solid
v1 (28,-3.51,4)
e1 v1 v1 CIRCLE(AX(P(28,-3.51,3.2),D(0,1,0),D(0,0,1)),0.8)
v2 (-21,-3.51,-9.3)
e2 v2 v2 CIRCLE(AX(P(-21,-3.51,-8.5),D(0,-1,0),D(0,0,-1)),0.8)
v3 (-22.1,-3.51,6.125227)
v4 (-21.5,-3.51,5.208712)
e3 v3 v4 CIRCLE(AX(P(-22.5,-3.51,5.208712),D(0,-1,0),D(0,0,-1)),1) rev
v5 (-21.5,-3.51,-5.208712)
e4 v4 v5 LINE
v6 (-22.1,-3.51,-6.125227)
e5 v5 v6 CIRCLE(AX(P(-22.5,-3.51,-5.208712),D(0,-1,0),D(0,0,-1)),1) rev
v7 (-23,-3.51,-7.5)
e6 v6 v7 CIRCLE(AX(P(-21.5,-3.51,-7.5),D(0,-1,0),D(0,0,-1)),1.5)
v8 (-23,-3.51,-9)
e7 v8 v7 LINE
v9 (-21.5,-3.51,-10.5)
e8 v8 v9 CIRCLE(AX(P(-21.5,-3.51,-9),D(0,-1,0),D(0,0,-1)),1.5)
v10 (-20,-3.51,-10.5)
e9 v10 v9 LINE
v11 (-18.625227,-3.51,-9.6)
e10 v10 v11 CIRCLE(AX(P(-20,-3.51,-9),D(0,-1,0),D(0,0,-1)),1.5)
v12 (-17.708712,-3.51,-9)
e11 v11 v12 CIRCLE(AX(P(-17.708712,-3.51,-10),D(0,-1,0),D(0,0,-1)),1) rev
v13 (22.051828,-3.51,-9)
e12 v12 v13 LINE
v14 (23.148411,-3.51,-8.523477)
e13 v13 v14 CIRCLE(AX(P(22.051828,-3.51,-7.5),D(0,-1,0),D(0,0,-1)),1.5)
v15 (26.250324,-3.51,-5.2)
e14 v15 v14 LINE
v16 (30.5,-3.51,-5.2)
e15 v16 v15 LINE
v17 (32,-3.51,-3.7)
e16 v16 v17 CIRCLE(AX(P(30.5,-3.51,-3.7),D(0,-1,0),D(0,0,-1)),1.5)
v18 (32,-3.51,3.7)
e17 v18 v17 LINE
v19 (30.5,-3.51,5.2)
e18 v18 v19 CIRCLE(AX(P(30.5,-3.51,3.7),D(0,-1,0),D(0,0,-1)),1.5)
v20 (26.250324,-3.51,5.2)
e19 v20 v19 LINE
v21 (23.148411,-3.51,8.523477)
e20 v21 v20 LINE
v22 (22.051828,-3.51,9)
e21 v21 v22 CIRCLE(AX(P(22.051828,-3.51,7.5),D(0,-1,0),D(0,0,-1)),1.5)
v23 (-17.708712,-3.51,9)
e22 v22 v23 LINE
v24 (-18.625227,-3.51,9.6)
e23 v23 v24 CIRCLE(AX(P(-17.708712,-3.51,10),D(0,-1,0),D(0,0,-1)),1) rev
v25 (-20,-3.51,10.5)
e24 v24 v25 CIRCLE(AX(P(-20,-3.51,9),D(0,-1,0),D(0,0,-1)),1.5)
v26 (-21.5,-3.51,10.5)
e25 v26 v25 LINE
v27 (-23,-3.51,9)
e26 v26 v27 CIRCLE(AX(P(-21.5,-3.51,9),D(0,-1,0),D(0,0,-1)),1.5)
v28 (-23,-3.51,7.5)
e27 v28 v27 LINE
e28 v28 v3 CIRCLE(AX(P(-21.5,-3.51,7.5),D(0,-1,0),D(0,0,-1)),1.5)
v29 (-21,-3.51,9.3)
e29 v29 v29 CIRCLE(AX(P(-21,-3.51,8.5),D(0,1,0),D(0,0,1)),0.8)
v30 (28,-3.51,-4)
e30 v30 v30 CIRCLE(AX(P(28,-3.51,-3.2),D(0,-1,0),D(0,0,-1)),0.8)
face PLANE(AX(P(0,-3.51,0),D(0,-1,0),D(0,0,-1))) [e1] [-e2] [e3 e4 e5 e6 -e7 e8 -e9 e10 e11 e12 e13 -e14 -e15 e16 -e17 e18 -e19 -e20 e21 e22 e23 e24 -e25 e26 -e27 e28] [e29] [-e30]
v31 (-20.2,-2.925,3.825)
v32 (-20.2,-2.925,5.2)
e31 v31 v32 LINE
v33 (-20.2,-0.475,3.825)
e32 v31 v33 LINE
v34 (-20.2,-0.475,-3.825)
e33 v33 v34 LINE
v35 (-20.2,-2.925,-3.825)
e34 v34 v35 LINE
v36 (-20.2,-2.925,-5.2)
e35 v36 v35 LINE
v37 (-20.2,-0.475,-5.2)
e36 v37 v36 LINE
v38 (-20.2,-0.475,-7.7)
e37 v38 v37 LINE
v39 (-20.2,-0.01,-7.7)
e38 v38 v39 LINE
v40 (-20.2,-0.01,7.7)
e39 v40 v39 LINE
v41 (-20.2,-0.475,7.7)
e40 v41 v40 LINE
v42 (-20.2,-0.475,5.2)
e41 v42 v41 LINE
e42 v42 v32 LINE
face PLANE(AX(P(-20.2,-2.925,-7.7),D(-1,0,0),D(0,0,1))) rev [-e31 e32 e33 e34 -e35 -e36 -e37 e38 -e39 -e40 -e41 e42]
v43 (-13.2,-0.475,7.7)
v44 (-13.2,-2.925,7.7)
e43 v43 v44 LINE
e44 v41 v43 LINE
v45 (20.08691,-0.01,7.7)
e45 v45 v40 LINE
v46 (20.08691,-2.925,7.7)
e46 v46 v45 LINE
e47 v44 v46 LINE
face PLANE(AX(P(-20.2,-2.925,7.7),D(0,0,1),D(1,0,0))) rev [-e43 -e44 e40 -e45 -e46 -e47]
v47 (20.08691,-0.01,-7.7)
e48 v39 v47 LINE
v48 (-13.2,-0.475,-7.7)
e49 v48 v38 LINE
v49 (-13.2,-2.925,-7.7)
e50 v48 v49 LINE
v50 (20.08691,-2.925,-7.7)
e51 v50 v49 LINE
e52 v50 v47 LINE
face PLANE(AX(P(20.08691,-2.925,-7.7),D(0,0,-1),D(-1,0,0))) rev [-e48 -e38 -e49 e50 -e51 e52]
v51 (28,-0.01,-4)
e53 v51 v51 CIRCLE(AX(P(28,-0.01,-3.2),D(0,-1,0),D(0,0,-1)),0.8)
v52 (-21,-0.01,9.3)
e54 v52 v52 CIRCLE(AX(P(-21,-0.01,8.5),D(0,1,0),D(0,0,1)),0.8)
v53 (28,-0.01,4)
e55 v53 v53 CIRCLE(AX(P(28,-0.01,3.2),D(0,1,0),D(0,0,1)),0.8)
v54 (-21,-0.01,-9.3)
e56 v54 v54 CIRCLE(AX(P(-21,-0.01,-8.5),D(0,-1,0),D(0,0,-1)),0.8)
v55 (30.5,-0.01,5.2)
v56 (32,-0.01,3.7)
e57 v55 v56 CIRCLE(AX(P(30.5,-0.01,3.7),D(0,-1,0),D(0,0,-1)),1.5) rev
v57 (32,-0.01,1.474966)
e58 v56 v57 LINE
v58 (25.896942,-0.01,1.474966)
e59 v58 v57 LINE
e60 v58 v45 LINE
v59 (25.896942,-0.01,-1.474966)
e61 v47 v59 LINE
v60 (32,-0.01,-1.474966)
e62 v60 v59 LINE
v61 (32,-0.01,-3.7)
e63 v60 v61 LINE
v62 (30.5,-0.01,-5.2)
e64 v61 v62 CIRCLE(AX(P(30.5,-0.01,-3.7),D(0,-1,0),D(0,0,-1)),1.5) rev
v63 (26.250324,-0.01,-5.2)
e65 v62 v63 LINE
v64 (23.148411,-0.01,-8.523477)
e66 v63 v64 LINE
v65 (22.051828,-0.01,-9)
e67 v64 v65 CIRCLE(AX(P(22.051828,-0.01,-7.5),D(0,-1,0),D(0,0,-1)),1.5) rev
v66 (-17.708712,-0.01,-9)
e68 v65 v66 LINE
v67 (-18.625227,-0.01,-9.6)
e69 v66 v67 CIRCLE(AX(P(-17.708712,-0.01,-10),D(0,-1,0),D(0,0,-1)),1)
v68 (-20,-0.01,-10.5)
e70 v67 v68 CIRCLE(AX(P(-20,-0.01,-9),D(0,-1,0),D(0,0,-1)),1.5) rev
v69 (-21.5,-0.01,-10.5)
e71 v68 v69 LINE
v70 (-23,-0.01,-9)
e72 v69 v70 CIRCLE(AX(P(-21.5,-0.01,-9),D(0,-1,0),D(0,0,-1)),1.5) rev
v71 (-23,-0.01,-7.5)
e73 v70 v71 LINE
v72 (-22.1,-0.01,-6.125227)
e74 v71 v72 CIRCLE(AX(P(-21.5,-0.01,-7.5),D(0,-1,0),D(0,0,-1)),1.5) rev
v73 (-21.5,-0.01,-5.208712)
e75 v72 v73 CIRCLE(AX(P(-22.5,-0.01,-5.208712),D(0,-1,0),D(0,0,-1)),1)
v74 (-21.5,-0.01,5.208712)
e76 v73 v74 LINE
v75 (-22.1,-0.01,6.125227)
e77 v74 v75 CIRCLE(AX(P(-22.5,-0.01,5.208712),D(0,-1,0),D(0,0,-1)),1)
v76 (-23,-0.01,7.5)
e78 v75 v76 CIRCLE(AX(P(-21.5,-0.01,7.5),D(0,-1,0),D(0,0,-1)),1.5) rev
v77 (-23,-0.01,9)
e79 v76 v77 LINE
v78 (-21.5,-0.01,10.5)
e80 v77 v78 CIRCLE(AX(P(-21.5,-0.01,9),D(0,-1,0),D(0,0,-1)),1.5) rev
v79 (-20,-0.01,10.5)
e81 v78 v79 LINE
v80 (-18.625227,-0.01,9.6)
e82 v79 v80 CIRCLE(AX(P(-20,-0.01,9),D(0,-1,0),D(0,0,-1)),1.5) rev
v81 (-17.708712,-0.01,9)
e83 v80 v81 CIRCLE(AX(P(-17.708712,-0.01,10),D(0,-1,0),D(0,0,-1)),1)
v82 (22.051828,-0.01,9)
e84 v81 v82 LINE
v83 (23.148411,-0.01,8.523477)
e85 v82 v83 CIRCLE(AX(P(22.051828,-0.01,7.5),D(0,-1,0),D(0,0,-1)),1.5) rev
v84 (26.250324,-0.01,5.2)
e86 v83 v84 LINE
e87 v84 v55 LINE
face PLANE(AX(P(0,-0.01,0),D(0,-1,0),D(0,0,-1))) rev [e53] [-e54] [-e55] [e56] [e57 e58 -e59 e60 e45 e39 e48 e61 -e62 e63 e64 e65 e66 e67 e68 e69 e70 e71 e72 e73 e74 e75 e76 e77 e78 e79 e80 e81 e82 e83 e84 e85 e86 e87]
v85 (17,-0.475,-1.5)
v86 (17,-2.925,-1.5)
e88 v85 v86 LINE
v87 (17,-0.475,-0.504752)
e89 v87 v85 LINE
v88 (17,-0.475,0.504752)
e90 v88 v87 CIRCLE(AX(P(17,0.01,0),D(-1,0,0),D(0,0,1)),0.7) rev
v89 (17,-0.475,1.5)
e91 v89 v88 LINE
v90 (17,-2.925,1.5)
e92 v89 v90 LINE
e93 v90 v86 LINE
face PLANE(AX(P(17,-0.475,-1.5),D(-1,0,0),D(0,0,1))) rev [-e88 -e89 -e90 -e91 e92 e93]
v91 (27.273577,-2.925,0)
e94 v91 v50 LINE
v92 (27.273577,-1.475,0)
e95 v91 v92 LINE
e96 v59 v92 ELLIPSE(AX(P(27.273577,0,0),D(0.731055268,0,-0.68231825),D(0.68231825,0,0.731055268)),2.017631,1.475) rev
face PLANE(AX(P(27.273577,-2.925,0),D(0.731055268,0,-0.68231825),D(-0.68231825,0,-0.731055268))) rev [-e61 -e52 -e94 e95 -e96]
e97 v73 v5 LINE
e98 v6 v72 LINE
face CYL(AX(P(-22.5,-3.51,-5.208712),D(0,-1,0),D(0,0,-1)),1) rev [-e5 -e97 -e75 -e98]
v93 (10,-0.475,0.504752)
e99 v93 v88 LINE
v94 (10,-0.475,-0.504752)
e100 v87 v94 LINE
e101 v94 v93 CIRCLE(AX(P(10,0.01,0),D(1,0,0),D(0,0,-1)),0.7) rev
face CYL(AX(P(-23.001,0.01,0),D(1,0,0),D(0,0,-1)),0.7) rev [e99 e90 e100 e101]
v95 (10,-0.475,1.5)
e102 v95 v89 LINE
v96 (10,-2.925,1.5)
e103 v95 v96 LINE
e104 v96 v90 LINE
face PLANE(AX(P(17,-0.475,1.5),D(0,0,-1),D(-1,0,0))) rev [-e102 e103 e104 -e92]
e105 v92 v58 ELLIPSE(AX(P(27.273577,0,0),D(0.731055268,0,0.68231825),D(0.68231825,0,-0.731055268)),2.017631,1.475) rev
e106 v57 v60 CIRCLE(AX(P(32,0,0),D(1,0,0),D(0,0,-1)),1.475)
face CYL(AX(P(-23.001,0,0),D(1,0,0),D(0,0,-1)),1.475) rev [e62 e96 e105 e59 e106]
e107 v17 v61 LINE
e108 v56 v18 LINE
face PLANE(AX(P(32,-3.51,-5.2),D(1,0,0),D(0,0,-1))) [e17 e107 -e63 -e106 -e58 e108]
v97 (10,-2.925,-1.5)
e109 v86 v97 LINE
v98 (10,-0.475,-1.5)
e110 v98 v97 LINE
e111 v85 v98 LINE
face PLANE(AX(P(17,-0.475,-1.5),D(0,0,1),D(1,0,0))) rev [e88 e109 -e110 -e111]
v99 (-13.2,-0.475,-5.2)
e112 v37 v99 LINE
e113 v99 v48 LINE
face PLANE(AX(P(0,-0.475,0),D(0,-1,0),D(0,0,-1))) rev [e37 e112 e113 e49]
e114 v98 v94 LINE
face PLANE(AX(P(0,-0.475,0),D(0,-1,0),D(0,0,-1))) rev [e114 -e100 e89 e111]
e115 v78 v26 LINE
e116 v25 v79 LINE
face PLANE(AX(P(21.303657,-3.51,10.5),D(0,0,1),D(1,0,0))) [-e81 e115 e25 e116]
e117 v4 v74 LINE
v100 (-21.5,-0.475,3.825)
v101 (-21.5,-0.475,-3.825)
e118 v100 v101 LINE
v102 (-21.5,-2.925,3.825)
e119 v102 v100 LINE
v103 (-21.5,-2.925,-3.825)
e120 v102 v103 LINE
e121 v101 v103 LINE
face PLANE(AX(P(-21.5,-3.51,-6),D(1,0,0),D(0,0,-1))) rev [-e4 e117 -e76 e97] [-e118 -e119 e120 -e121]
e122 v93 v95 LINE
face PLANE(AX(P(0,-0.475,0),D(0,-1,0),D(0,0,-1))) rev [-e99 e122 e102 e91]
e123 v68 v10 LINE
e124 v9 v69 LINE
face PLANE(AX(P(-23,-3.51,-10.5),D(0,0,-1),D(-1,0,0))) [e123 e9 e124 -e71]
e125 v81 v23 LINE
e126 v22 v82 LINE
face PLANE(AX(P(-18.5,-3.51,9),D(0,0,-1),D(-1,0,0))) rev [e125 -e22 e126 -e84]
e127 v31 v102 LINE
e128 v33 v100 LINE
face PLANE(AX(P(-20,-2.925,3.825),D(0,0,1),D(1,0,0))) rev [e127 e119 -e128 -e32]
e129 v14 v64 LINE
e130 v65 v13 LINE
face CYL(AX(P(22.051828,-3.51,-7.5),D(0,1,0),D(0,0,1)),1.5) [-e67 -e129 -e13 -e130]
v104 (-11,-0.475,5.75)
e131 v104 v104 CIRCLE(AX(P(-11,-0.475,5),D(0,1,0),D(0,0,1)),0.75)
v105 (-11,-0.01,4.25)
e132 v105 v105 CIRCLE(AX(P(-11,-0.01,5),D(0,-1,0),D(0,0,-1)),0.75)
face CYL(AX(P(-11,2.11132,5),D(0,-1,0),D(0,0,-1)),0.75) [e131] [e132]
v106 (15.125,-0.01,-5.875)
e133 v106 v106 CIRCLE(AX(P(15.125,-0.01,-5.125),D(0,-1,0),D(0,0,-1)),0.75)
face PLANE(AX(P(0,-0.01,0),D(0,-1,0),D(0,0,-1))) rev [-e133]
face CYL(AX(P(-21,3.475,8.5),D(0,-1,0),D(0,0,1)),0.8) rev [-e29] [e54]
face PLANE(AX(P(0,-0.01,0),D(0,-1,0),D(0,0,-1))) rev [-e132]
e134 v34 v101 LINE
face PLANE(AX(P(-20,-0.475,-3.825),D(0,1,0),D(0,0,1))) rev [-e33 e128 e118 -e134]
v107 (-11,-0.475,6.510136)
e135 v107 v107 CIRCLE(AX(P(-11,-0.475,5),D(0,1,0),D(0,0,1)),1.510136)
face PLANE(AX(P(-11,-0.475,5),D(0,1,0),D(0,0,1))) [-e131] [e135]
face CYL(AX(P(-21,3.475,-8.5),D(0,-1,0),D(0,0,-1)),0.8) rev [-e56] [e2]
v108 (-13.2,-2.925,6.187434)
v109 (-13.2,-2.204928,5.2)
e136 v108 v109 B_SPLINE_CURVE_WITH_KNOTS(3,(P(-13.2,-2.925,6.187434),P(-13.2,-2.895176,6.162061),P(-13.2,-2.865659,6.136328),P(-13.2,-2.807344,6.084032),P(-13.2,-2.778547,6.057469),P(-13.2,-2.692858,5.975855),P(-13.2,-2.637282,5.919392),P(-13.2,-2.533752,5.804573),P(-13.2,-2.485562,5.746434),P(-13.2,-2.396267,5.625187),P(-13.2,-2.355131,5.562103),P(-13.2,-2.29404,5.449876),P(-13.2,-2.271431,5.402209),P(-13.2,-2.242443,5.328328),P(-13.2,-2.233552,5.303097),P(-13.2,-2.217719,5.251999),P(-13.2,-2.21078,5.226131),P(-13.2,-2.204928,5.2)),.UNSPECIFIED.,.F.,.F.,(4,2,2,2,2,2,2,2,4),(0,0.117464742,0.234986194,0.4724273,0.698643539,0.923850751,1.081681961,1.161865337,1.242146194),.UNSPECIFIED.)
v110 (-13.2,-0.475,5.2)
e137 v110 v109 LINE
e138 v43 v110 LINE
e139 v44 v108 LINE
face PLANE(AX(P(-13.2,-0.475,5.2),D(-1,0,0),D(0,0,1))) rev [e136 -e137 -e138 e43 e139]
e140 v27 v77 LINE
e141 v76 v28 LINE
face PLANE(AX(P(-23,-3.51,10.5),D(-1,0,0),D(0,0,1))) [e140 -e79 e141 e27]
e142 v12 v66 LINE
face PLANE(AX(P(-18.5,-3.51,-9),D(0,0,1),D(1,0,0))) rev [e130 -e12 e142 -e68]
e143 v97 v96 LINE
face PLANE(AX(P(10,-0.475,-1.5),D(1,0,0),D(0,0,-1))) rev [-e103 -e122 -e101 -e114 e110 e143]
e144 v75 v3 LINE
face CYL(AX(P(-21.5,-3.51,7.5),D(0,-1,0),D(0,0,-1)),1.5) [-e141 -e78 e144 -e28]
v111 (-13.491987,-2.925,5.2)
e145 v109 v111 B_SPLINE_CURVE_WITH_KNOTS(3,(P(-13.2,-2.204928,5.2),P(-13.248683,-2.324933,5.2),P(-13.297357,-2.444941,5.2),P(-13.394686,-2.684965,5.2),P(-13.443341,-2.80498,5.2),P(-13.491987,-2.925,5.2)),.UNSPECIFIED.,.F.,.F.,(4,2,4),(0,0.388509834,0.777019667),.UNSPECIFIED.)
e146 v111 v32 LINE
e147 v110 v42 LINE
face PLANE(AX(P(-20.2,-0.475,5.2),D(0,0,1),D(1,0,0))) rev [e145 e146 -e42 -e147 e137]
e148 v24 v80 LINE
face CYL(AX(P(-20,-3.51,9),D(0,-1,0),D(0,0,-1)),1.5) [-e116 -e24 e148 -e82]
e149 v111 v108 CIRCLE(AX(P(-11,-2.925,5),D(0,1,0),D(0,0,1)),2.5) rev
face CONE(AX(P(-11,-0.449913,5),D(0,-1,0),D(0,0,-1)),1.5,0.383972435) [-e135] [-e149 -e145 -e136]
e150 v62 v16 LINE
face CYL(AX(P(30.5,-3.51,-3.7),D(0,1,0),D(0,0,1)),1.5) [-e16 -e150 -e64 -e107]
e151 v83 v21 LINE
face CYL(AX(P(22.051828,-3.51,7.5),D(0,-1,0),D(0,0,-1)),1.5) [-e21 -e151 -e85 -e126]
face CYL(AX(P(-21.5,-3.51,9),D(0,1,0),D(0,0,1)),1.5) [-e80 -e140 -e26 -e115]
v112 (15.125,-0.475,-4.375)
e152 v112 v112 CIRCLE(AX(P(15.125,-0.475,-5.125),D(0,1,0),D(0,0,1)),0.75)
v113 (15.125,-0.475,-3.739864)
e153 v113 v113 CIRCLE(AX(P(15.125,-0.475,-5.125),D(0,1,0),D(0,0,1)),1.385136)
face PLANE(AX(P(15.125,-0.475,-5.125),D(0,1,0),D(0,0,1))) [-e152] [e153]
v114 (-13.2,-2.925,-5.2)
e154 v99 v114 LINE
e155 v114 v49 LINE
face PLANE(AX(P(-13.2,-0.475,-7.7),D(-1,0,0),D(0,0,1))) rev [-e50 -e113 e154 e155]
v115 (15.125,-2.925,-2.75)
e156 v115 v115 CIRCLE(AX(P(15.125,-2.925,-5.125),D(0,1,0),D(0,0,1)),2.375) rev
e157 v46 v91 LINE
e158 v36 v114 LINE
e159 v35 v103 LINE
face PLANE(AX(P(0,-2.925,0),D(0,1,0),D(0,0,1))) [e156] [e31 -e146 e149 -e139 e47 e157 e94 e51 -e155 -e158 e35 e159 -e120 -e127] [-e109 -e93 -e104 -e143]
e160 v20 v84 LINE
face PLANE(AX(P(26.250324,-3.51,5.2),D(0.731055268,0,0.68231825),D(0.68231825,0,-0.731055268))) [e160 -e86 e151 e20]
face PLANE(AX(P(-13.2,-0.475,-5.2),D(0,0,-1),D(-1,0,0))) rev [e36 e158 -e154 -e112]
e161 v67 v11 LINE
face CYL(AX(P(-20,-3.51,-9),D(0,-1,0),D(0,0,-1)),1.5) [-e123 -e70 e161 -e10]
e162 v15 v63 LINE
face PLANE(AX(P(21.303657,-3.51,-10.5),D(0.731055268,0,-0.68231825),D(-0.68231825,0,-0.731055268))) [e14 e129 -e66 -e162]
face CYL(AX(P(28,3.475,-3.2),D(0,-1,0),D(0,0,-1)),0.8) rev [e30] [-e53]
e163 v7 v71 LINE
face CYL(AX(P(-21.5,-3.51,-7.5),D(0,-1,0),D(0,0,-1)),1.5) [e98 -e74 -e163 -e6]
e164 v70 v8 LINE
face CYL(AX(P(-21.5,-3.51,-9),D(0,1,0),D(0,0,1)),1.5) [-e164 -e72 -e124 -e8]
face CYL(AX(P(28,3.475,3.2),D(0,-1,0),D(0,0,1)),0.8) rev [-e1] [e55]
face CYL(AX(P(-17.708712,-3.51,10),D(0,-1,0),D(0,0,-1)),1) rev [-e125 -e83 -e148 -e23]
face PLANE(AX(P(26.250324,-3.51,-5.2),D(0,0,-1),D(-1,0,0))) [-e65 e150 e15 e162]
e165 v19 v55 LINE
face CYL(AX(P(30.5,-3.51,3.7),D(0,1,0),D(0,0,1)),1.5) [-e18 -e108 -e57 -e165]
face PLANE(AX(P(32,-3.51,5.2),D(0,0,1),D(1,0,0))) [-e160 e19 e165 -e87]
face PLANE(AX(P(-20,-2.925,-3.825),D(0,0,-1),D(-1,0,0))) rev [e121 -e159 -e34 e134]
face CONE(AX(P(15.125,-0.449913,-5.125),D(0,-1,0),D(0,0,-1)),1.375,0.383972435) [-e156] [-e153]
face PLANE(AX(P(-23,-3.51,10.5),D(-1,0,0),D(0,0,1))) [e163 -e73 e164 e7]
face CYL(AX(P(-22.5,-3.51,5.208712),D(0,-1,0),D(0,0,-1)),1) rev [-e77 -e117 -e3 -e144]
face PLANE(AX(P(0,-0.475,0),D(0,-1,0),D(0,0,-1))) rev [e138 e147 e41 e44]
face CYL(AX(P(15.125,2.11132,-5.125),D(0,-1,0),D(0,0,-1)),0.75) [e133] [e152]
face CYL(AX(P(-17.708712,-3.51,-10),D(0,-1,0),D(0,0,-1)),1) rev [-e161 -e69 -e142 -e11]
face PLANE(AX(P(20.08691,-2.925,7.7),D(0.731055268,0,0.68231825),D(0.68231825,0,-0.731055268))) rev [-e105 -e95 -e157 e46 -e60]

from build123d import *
from OCP.BRepFilletAPI import BRepFilletAPI_MakeChamfer

# Parameters (mm, degrees)
BOSS_EXTRUDE1_START      = -0.01
BOSS_EXTRUDE1_DEPTH      = 3.5
CUT_EXTRUDE1_DEPTH       = 2.925
SKETCH5_R                = 1.5
SKETCH5_R_2              = 1.375
SKETCH5_W                = 7
SKETCH5_H                = 2.5
SKETCH5_H_2              = 3
BOSS_EXTRUDE2_DEPTH      = 2.45
CHAMFER1_SIZE            = 1
CHAMFER1_SIZE_2          = 2.475086853
SKETCH15_R               = 0.75
BOSS_EXTRUDE5_DEPTH      = 0.465
SKETCH7_W                = 7.65
SKETCH7_H                = 2.45
CUT_EXTRUDE2_DEPTH       = 3
BOSS_EXTRUDE3_START      = 0.01
BOSS_EXTRUDE3_DEPTH      = 3.465
CUT_EXTRUDE3_DEPTH       = 2.475
SKETCH10_R               = 1.5
SKETCH10_R_2             = 1.375
BOSS_EXTRUDE4_DEPTH      = 2
CHAMFER2_SIZE            = 0.5
CHAMFER2_SIZE_2          = 2
BOSS_EXTRUDE6_START      = 2.95
SKETCH10_3_R             = 0.75
BOSS_EXTRUDE6_DEPTH      = 2.95
SKETCH21_W               = 2
SKETCH21_H               = 15.4
BOSS_EXTRUDE7_DEPTH      = 2
CUT_EXTRUDE6_START       = -3.465
SKETCH16_R               = 1
CUT_EXTRUDE6_DEPTH       = 38.860351794
SKETCH19_R               = 0.8
CUT_EXTRUDE9_DEPTH       = 35.395351794
SKETCH17_R               = 1.85
CUT_EXTRUDE7_DEPTH       = 2
SKETCH12_W               = 5
SKETCH12_H               = 4.8
CUT_EXTRUDE4_DEPTH       = 1
SKETCH13_R               = 1.475
CUT_EXTRUDE5_DEPTH       = 11.91309
CUT_EXTRUDE10_START      = -23
CUT_EXTRUDE10_DEPTH      = 9
CUT_EXTRUDE10_START_2    = -13.91308954
CUT_EXTRUDE10_2_DEPTH    = 2
CUT_EXTRUDE11_DEPTH      = 35.395351794
CUT_EXTRUDE11_DEPTH_BACK = 35.395351794
SKETCH22_W               = 1.5
SKETCH22_H               = 12
SKETCH22_W_2             = 43.847191308
SKETCH22_H_2             = 1.5
FILLET1_R                = 1.5
FILLET2_R                = 1.5
FILLET3_R                = 1
FILLET4_R                = 1


with BuildPart() as part:
    # Sketch2 → Boss-Extrude1 (new body)
    with BuildSketch(Plane(origin=(0, 0, 0), x_dir=(1, 0, 0), z_dir=(0, 1, 0)).offset(BOSS_EXTRUDE1_START)):
        Polygon((-23, 10.5), (21.303656906, 10.5), (26.250323572, 5.2), (32, 5.2), (32, -5.2), (26.250323572, -5.2), (21.303656906, -10.5), (-23, -10.5), align=None)
    extrude(amount=-BOSS_EXTRUDE1_DEPTH)

    # Sketch3 → Cut-Extrude1 (cut)
    with BuildSketch(Plane(origin=(0, 0, 0), x_dir=(1, 0, 0), z_dir=(0, 1, 0))):
        Polygon((-20.2, 7.7), (-20.2, -7.7), (20.08691046, -7.7), (27.273577127, 0), (20.08691046, 7.7), align=None)
    extrude(amount=-CUT_EXTRUDE1_DEPTH, mode=Mode.SUBTRACT)

    # Sketch5 → Boss-Extrude2 (add)
    with BuildSketch(Plane(origin=(0, -2.925, 0), x_dir=(1, 0, 0), z_dir=(0, 1, 0))):
        with Locations(Location((-11, -5, 0), (0, 0, 270))):
            Circle(SKETCH5_R)
        with Locations(Location((15.125, 5.125, 0), (0, 0, 270))):
            Circle(SKETCH5_R_2)
        with Locations((-16.7, -6.45)):
            Rectangle(SKETCH5_W, SKETCH5_H)
        with Locations((-16.7, 6.45)):
            Rectangle(SKETCH5_W, SKETCH5_H)
        with Locations((13.5, 0)):
            Rectangle(SKETCH5_W, SKETCH5_H_2)
    extrude(amount=BOSS_EXTRUDE2_DEPTH)

    # Chamfer1
    # the kernel refuses this chamfer: 2.475086853, 1 mm, written as the material it adds along each edge
    with BuildSketch(Plane(origin=(-11, -2.925, 5), x_dir=(0, 0, 1), z_dir=(-1, 0, 0))) as chamfer1_piece_1_section:
        Polygon((1.5 + CHAMFER1_SIZE, 0), (1.5, CHAMFER1_SIZE_2), (1.5, 0), align=None)
    chamfer1_piece_1 = revolve(axis=Axis((-11, -2.925, 5), (0, 1, 0)), mode=Mode.PRIVATE)
    chamfer1_piece_1 = split(chamfer1_piece_1, bisect_by=Plane(origin=(-11, -0.475, 5), z_dir=(0, -1, 0)), keep=Keep.TOP, mode=Mode.PRIVATE)
    add(chamfer1_piece_1)
    with BuildSketch(Plane(origin=(15.125, -2.925, -5.125), x_dir=(0, 0, 1), z_dir=(-1, 0, 0))) as chamfer1_piece_2_section:
        Polygon((1.375 + CHAMFER1_SIZE, 0), (1.375, CHAMFER1_SIZE_2), (1.375, 0), align=None)
    chamfer1_piece_2 = revolve(axis=Axis((15.125, -2.925, -5.125), (0, 1, 0)), mode=Mode.PRIVATE)
    chamfer1_piece_2 = split(chamfer1_piece_2, bisect_by=Plane(origin=(15.125, -0.475, -5.125), z_dir=(0, -1, 0)), keep=Keep.TOP, mode=Mode.PRIVATE)
    add(chamfer1_piece_2)

    # Sketch15 → Boss-Extrude5 (add)
    with BuildSketch(Plane(origin=(0, -0.475, 0), x_dir=(1, 0, 0), z_dir=(0, 1, 0))):
        with Locations(Location((-11, -5, 0), (0, 0, 90))):
            Circle(SKETCH15_R)
        with Locations(Location((15.125, 5.125, 0), (0, 0, 90))):
            Circle(SKETCH15_R)
    extrude(amount=BOSS_EXTRUDE5_DEPTH)

    # Sketch7 → Cut-Extrude2 (cut)
    with BuildSketch(Plane.ZY.offset(23)):
        with Locations((0, -1.7)):
            Rectangle(SKETCH7_W, SKETCH7_H)
    extrude(amount=-CUT_EXTRUDE2_DEPTH, mode=Mode.SUBTRACT)

    # Sketch19 → Cut-Extrude9 (cut, through all)
    with BuildSketch(Plane.XZ.offset(3.51)):
        with Locations(Location((-21, -8.5, 0), (0, 0, 270))):
            Circle(SKETCH19_R)
        with Locations(Location((28, -3.2, 0), (0, 0, 270))):
            Circle(SKETCH19_R)
    cut_extrude9 = extrude(amount=-CUT_EXTRUDE9_DEPTH, mode=Mode.SUBTRACT)


with BuildPart() as body_2:
    # Sketch2<2> → Boss-Extrude3 (new body)
    with BuildSketch(Plane(origin=(0, 0, 0), x_dir=(1, 0, 0), z_dir=(0, 1, 0)).offset(BOSS_EXTRUDE3_START)):
        Polygon((-23, 10.5), (21.303656906, 10.5), (26.250323572, 5.2), (32, 5.2), (32, -5.2), (26.250323572, -5.2), (21.303656906, -10.5), (-23, -10.5), align=None)
    extrude(amount=BOSS_EXTRUDE3_DEPTH)

    # Sketch3<2> → Cut-Extrude3 (cut)
    with BuildSketch(Plane(origin=(0, 0, 0), x_dir=(1, 0, 0), z_dir=(0, 1, 0))):
        Polygon((-20.2, 7.7), (-20.2, -7.7), (20.08691046, -7.7), (27.273577127, 0), (20.08691046, 7.7), align=None)
    extrude(amount=CUT_EXTRUDE3_DEPTH, mode=Mode.SUBTRACT)

    # Sketch10 → Boss-Extrude4 (add)
    with BuildSketch(Plane.XZ.offset(-2.475)):
        with Locations(Location((-11, 5, 0), (0, 0, 270))):
            Circle(SKETCH10_R)
        with Locations(Location((15.125, -5.125, 0), (0, 0, 270))):
            Circle(SKETCH10_R_2)
    extrude(amount=BOSS_EXTRUDE4_DEPTH)

    # Chamfer2
    chamfer2_edges_1 = [body_2.edges().sort_by_distance(p)[0] for p in [
        (-11, 2.475, 6.5),
    ]]
    chamfer2_side_1 = [body_2.faces().sort_by_distance(p)[0] for p in [
        (-11, 2.475, 6.51),
    ]]
    chamfer2_edges_2 = [body_2.edges().sort_by_distance(p)[0] for p in [
        (15.125, 2.475, -3.75),
    ]]
    chamfer2_side_2 = [body_2.faces().sort_by_distance(p)[0] for p in [
        (15.125, 2.475, -3.74),
    ]]
    chamfer2 = BRepFilletAPI_MakeChamfer(body_2.part.solid().wrapped)
    for e in chamfer2_edges_1:
        chamfer2.Add(CHAMFER2_SIZE - 0.0001, CHAMFER2_SIZE_2 - 0.0001, e.wrapped, chamfer2_side_1[0].wrapped)
    for e in chamfer2_edges_2:
        chamfer2.Add(CHAMFER2_SIZE - 0.0001, CHAMFER2_SIZE_2 - 0.0001, e.wrapped, chamfer2_side_2[0].wrapped)
    add(Compound.cast(chamfer2.Shape()), mode=Mode.REPLACE)  # a hair under: the kernel refuses the full size

    # Sketch10<3> → Boss-Extrude6 (add)
    with BuildSketch(Plane.XZ.offset(-2.475).offset(BOSS_EXTRUDE6_START)):
        with Locations(Location((-11, 5, 0), (0, 0, 270))):
            Circle(SKETCH10_3_R)
        with Locations(Location((15.125, -5.125, 0), (0, 0, 270))):
            Circle(SKETCH10_3_R)
    extrude(amount=-BOSS_EXTRUDE6_DEPTH)

    # Sketch21 → Boss-Extrude7 (add)
    with BuildSketch(Plane.XZ.offset(-2.475)):
        Polygon((-20.2, 7.7), (-18.2, 7.7), (-18.2, 2), (-14.2, 2), (-14.2, -2), (-18.2, -2), (-18.2, -7.7), (-20.2, -7.7), align=None)
        with Locations((19.08691046, 0)):
            Rectangle(SKETCH21_W, SKETCH21_H)
    extrude(amount=BOSS_EXTRUDE7_DEPTH)

    # Sketch16 → Cut-Extrude6 (cut)
    with BuildSketch(Plane(origin=(0, 3.475, 0), x_dir=(1, 0, 0), z_dir=(0, 1, 0)).offset(CUT_EXTRUDE6_START)):
        with Locations(Location((-21, 8.5, 0), (0, 0, 90))):
            Circle(SKETCH16_R)
        with Locations(Location((28, 3.2, 0), (0, 0, 90))):
            Circle(SKETCH16_R)
    cut_extrude6 = extrude(amount=CUT_EXTRUDE6_DEPTH, mode=Mode.SUBTRACT)

    # Sketch17 → Cut-Extrude7 (cut)
    with BuildSketch(Plane(origin=(0, 3.475, 0), x_dir=(1, 0, 0), z_dir=(0, 1, 0))):
        with Locations(Location((-21, 8.5, 0), (0, 0, 270))):
            Circle(SKETCH17_R)
        with Locations(Location((28, 3.2, 0), (0, 0, 270))):
            Circle(SKETCH17_R)
    cut_extrude7 = extrude(amount=-CUT_EXTRUDE7_DEPTH, mode=Mode.SUBTRACT)


with BuildPart() as mirror2_tool:
    # Mirror2: Cut-Extrude6, Cut-Extrude9, Cut-Extrude7 across plane
    add(cut_extrude6.mirror(Plane.XY))
    add(cut_extrude9.mirror(Plane.XY))
    add(cut_extrude7.mirror(Plane.XY))


with BuildPart() as part_1:
    add(part.part)

    # Mirror2: cut by mirror2_tool
    add(mirror2_tool.part, mode=Mode.SUBTRACT)


with BuildPart() as body_2_1:
    add(body_2.part)

    # Mirror2: cut by mirror2_tool
    add(mirror2_tool.part, mode=Mode.SUBTRACT)

    # Sketch12 → Cut-Extrude4 (cut)
    with BuildSketch(Plane(origin=(0, 3.475, 0), x_dir=(1, 0, 0), z_dir=(0, 1, 0))):
        with Locations((-9.5, -0.5)):
            Rectangle(SKETCH12_W, SKETCH12_H)
    extrude(amount=-CUT_EXTRUDE4_DEPTH, mode=Mode.SUBTRACT)


with BuildPart() as cut_extrude5_tool:
    # Sketch13 → Cut-Extrude5 (new body)
    with BuildSketch(Plane(origin=(32, 0, 0), x_dir=(0, 0, -1), z_dir=(1, 0, 0))):
        Circle(SKETCH13_R)
    extrude(amount=-CUT_EXTRUDE5_DEPTH)


with BuildPart() as part_2:
    add(part_1.part)

    # Cut-Extrude5: cut by cut_extrude5_tool
    add(cut_extrude5_tool.part, mode=Mode.SUBTRACT)

    # Cut-Extrude10: read off the stored shape, not the designer's step
    # Cut-Extrude10 outline → Cut-Extrude10 (cut)
    with BuildSketch(Plane(origin=(32, 0, 0), x_dir=(0, 0, -1), z_dir=(1, 0, 0)).offset(CUT_EXTRUDE10_START)):
        with BuildLine():
            Line((0.504752415, -0.475), (-0.504752415, -0.475))
            ThreePointArc((-0.504752415, -0.475), (0, -0.69), (0.504752415, -0.475))
        make_face()
    extrude(amount=CUT_EXTRUDE10_DEPTH, mode=Mode.SUBTRACT)


with BuildPart() as body_2_2:
    add(body_2_1.part)

    # Cut-Extrude5: cut by cut_extrude5_tool
    add(cut_extrude5_tool.part, mode=Mode.SUBTRACT)

    # Cut-Extrude10 2 outline → Cut-Extrude10 2 (cut)
    with BuildSketch(Plane(origin=(32, 0, 0), x_dir=(0, 0, -1), z_dir=(1, 0, 0)).offset(CUT_EXTRUDE10_START_2)):
        with BuildLine():
            Line((-0.523235129, 0.475), (0.523235129, 0.475))
            ThreePointArc((0.523235129, 0.475), (0, 0.71), (-0.523235129, 0.475))
        make_face()
    extrude(amount=CUT_EXTRUDE10_2_DEPTH, mode=Mode.SUBTRACT)


with BuildPart() as cut_extrude11_tool:
    # Sketch22 → Cut-Extrude11 (new, two sides: drawn at the far end of the back side and taken through both)
    with BuildSketch(Plane(origin=(0, 3.475, 0), x_dir=(1, 0, 0), z_dir=(0, 1, 0)).offset(-CUT_EXTRUDE11_DEPTH_BACK)):
        with Locations((-22.25, 0)):
            Rectangle(SKETCH22_W, SKETCH22_H)
        with Locations((3.423595654, 9.75)):
            Rectangle(SKETCH22_W_2, SKETCH22_H_2)
        with Locations((3.423595654, -9.75)):
            Rectangle(SKETCH22_W_2, SKETCH22_H_2)
    extrude(amount=CUT_EXTRUDE11_DEPTH + CUT_EXTRUDE11_DEPTH_BACK)


with BuildPart() as part_3:
    add(part_2.part)

    # Cut-Extrude11: cut by cut_extrude11_tool
    add(cut_extrude11_tool.part, mode=Mode.SUBTRACT)

    # Fillet2
    fillet2_edges = [part_3.edges().sort_by_distance(p)[0] for p in [
        (-18.5, -1.76, -10.5),
        (-18.5, -1.76, 10.5),
        (-23, -1.76, -6),
        (-23, -1.76, 10.5),
        (32, -1.76, 5.2),
        (-23, -1.76, 6),
        (-23, -1.76, -10.5),
        (32, -1.76, -5.2),
        (22.703656906, -1.76, 9),
        (22.703656906, -1.76, -9),
    ]]
    fillet(fillet2_edges, radius=FILLET2_R - 0.0001)  # a hair under: the kernel refuses the full size

    # Fillet4
    fillet4_edges = [part_3.edges().sort_by_distance(p)[0] for p in [
        (-21.5, -1.76, 6),
        (-21.5, -1.76, -6),
        (-18.5, -1.76, -9),
        (-18.5, -1.76, 9),
    ]]
    fillet(fillet4_edges, radius=FILLET4_R)


with BuildPart() as body_2_3:
    add(body_2_2.part)

    # Cut-Extrude11: cut by cut_extrude11_tool
    add(cut_extrude11_tool.part, mode=Mode.SUBTRACT)

    # Fillet1
    fillet1_edges = [body_2_3.edges().sort_by_distance(p)[0] for p in [
        (-23, 1.7425, -10.5),
        (-23, 1.7425, -6),
        (32, 1.7425, -5.2),
        (32, 1.7425, 5.2),
        (-18.5, 1.7425, 10.5),
        (-23, 1.7425, 6),
        (-23, 1.7425, 10.5),
        (-18.5, 1.7425, -10.5),
        (22.703656906, 1.7425, -9),
        (22.703656906, 1.7425, 9),
    ]]
    fillet(fillet1_edges, radius=FILLET1_R - 0.0001)  # a hair under: the kernel refuses the full size

    # Fillet3
    fillet3_edges = [body_2_3.edges().sort_by_distance(p)[0] for p in [
        (-21.5, 1.7425, -6),
        (-21.5, 1.7425, 6),
        (-18.5, 1.7425, -9),
        (-18.5, 1.7425, 9),
    ]]
    fillet(fillet3_edges, radius=FILLET3_R)


solid = part_3.part
